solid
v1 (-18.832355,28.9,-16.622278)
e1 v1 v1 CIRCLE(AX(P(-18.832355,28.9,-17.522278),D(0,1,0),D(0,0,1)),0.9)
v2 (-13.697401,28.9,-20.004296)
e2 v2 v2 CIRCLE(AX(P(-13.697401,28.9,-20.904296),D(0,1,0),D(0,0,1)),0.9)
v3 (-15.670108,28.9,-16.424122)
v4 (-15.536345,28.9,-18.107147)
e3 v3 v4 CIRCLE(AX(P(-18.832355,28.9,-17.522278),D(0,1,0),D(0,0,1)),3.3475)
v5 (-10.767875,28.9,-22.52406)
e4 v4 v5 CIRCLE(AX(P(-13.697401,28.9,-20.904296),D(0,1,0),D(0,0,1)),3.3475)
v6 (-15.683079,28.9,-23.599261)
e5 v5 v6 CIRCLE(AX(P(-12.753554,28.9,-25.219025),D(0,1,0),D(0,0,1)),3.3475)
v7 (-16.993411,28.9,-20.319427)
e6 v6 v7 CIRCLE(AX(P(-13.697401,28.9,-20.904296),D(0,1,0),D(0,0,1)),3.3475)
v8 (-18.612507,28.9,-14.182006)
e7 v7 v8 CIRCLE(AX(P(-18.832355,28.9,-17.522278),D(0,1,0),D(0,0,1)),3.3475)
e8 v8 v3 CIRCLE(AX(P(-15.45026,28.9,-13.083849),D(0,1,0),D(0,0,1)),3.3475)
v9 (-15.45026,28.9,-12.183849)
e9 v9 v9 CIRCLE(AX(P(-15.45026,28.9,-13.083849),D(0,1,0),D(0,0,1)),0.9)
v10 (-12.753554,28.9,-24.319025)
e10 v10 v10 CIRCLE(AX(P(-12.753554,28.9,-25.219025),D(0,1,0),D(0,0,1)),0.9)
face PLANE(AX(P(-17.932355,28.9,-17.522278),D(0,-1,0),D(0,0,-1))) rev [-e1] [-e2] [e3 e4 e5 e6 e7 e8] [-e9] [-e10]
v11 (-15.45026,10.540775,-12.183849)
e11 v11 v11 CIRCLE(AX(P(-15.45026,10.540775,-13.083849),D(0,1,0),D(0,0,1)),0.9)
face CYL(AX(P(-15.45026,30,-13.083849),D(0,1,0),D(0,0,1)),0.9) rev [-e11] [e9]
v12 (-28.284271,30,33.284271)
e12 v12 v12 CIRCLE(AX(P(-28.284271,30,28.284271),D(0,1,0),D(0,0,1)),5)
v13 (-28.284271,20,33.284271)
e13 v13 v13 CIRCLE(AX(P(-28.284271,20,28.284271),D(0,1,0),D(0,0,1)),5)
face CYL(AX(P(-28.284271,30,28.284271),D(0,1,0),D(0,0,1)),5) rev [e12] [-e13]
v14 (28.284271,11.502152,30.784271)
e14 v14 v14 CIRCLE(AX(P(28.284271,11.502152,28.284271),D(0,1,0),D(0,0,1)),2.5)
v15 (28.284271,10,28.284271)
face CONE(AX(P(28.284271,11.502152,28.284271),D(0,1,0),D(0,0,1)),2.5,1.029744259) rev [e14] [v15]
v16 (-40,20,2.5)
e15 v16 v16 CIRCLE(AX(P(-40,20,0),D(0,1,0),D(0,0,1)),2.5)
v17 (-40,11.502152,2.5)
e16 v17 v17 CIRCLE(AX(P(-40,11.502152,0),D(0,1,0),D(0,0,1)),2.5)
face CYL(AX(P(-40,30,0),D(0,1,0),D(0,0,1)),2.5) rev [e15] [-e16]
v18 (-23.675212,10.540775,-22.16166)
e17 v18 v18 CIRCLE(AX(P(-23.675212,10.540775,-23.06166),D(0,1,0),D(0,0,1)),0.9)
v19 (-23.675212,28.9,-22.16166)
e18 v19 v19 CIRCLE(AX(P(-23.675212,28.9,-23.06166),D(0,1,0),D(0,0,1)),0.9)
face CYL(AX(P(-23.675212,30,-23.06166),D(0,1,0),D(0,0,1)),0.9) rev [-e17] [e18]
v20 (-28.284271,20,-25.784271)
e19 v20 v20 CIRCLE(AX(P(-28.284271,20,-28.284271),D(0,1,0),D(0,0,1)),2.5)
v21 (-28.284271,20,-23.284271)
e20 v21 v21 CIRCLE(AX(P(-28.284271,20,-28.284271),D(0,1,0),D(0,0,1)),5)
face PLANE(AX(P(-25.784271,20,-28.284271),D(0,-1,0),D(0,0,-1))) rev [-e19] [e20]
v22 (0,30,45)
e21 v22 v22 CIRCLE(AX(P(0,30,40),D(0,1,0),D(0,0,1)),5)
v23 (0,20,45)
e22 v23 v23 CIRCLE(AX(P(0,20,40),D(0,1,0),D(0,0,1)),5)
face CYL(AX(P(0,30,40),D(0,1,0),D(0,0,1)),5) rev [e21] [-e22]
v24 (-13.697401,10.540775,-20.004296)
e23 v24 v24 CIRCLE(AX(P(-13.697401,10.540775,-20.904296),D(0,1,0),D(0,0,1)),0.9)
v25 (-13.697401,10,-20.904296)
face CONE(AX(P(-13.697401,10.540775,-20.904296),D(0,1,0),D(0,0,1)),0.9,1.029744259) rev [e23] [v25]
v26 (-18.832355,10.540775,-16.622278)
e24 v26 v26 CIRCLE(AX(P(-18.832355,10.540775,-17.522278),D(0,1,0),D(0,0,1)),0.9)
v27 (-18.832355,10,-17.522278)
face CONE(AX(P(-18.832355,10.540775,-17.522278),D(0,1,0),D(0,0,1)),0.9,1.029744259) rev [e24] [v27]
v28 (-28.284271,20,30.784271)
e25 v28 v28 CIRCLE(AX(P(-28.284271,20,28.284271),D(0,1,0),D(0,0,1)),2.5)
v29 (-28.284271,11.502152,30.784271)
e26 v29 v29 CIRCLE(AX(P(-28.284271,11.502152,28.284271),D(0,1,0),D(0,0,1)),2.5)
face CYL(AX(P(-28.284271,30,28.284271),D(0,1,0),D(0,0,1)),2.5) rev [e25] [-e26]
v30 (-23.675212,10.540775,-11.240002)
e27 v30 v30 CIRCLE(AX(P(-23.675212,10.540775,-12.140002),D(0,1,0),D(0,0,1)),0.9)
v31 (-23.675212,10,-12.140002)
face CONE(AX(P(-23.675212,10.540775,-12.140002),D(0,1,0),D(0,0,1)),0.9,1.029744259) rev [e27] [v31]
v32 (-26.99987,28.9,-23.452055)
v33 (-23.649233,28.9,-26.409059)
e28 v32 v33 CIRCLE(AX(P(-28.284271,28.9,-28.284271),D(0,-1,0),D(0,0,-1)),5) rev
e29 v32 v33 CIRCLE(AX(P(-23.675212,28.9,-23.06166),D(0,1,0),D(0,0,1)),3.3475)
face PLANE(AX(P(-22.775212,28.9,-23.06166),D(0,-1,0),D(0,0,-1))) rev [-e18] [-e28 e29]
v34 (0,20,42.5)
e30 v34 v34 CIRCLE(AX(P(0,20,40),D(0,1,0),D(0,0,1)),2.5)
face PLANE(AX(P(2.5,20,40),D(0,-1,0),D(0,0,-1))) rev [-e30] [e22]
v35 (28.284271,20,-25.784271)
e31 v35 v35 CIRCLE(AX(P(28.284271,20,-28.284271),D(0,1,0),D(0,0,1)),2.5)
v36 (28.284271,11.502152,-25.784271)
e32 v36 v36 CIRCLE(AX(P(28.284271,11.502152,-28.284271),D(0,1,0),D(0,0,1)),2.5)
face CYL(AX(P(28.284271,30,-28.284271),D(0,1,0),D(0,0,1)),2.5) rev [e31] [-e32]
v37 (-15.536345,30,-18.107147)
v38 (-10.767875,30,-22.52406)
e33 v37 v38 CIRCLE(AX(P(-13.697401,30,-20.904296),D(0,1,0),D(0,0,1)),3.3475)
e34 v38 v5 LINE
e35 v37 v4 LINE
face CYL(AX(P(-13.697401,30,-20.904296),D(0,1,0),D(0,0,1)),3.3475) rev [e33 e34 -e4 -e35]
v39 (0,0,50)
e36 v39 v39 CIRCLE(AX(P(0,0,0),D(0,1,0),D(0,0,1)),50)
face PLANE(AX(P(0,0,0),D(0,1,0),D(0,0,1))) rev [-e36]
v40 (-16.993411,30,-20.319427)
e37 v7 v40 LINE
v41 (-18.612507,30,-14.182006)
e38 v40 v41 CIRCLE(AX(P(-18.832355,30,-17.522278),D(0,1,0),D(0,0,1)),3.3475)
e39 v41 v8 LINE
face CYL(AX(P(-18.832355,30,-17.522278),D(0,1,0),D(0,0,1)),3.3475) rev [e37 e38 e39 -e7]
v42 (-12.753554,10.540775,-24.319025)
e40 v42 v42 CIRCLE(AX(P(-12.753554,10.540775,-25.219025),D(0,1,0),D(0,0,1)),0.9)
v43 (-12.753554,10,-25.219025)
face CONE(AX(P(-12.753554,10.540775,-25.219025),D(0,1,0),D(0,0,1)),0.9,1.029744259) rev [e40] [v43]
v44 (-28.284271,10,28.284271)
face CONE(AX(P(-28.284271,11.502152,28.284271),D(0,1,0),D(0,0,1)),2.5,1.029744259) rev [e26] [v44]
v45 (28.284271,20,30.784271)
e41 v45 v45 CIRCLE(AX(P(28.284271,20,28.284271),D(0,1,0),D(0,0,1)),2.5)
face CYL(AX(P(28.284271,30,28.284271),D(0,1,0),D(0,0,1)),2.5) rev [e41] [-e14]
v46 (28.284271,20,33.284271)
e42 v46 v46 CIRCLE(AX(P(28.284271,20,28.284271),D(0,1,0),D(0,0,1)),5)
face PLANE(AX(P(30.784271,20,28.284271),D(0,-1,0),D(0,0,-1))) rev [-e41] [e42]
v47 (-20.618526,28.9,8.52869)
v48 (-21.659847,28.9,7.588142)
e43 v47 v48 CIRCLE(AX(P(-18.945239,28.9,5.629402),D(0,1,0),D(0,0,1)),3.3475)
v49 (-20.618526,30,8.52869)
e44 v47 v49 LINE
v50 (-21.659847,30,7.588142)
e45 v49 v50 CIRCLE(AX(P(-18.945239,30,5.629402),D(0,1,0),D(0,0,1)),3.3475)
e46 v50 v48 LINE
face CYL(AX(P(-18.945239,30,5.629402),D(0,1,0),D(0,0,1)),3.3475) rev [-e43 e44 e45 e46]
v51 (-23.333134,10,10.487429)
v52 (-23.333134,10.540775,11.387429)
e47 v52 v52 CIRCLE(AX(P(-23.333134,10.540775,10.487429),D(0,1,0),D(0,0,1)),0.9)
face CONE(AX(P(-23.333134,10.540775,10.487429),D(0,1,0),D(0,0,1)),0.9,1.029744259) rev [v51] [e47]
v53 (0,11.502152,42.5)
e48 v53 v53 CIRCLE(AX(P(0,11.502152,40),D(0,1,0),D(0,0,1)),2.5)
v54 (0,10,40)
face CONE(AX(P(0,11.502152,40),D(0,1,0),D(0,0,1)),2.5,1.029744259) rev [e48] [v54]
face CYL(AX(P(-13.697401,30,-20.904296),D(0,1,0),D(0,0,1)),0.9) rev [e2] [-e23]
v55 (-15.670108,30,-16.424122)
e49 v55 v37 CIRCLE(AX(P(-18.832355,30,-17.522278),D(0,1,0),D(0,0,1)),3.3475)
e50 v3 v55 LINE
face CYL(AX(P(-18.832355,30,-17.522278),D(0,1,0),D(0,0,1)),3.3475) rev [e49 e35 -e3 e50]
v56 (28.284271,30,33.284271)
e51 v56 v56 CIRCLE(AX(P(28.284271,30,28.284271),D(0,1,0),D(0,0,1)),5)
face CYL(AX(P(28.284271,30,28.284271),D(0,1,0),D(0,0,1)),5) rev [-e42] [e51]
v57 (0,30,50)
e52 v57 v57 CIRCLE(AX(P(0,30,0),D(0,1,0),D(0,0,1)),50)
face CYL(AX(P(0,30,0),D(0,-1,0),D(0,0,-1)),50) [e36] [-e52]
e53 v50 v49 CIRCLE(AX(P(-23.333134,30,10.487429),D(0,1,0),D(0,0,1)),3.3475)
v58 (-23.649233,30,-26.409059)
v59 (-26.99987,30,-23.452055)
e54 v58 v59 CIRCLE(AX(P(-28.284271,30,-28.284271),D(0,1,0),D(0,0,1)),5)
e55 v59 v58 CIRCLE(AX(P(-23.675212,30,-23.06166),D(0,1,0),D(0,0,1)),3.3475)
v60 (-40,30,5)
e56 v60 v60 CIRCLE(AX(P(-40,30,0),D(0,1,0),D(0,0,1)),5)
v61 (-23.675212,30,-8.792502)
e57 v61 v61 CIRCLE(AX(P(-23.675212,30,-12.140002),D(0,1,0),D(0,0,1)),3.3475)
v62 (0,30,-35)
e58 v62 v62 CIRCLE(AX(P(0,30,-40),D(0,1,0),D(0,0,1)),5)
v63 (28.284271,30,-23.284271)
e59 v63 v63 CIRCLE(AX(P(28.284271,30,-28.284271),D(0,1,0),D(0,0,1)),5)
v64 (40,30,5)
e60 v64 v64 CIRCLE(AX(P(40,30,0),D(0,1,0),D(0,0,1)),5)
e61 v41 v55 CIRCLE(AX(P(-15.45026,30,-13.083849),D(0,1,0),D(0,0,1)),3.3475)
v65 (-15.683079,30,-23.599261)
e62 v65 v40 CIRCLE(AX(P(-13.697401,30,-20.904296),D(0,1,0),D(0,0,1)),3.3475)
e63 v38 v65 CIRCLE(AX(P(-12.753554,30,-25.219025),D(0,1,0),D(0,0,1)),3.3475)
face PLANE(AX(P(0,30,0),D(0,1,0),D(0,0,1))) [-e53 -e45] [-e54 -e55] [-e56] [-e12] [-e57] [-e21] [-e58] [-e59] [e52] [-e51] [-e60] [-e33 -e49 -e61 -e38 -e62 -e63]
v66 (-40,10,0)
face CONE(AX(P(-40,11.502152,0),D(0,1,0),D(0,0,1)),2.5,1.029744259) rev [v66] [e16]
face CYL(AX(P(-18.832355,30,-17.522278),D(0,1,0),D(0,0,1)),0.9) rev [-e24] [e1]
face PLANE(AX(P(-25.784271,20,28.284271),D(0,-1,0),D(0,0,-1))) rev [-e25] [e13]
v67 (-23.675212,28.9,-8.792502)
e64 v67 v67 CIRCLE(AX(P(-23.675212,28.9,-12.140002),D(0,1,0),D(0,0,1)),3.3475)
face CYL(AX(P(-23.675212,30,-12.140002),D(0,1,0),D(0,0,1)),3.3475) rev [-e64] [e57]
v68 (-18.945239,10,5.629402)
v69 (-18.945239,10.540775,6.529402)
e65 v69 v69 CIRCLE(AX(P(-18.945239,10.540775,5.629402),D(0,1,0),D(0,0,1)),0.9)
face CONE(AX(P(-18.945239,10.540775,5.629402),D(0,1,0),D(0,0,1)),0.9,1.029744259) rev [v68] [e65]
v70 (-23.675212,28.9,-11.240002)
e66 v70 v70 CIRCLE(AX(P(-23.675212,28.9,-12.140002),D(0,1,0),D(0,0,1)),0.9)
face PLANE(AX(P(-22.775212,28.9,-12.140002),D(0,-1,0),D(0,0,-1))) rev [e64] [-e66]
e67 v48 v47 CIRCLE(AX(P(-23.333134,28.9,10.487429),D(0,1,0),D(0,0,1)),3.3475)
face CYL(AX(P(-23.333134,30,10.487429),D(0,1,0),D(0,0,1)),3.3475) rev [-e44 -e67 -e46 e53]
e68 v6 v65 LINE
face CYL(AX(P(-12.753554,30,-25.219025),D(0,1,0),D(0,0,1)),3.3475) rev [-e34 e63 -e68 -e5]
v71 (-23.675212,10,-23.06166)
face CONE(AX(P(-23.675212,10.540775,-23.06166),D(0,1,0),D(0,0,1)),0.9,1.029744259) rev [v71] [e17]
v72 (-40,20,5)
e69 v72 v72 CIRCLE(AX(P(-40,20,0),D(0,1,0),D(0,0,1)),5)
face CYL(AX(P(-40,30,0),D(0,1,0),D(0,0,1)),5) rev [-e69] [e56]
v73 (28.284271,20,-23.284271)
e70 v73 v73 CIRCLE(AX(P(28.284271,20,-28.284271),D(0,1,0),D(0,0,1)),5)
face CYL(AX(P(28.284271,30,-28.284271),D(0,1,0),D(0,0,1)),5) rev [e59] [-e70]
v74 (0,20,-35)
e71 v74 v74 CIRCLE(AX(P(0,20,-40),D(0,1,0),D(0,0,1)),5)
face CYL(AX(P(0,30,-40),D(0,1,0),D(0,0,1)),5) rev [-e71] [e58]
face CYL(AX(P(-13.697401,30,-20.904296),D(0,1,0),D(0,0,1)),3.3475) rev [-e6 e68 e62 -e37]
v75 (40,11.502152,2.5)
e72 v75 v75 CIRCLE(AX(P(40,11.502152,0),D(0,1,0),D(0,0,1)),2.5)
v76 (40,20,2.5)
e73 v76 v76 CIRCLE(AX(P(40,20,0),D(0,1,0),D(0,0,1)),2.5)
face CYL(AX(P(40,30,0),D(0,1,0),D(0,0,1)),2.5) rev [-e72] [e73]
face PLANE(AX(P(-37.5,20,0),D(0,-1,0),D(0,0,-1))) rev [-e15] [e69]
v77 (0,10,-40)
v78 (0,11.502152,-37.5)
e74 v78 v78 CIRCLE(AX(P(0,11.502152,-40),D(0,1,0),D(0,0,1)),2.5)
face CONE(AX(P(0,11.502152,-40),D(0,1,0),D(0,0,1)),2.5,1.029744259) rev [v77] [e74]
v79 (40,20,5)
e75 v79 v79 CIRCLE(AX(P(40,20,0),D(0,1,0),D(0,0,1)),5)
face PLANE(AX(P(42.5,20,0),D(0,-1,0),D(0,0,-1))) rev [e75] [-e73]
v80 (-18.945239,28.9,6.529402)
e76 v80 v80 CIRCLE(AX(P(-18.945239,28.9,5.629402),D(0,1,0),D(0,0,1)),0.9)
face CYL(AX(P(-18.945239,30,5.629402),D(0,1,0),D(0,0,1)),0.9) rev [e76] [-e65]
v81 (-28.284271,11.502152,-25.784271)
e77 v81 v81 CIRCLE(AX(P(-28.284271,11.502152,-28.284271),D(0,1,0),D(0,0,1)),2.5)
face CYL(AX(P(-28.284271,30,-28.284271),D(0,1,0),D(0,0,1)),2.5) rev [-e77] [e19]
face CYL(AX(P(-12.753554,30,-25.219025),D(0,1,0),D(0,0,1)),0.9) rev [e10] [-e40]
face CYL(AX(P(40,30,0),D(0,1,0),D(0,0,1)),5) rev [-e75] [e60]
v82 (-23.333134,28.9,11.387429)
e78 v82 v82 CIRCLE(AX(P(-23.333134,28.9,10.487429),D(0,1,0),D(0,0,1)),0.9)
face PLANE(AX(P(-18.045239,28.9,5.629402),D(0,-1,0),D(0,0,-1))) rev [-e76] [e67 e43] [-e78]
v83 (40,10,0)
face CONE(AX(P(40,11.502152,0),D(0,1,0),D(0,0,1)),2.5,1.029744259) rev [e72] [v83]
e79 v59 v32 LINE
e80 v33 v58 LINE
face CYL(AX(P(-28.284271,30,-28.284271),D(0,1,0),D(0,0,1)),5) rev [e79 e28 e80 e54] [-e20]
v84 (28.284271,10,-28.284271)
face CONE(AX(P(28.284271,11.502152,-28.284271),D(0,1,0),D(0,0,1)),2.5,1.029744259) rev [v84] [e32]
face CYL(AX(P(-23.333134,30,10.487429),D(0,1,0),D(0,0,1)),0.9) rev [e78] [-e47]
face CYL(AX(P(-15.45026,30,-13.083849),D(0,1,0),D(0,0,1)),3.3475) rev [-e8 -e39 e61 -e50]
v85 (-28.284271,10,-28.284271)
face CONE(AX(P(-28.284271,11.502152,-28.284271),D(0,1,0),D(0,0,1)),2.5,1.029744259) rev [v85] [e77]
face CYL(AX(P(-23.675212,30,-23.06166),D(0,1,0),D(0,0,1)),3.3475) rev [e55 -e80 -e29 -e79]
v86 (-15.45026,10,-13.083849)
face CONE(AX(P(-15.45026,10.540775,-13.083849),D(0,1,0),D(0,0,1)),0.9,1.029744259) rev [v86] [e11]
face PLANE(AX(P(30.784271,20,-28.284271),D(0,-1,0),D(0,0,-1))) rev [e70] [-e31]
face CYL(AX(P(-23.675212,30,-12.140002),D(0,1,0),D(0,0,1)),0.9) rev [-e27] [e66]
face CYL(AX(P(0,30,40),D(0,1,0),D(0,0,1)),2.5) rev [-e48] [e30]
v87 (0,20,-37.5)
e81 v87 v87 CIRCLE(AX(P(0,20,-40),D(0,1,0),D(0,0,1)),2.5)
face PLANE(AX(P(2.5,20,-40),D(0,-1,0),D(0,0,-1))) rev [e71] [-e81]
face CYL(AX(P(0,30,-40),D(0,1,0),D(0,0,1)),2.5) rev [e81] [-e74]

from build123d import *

# Parameters (mm, degrees)
SKETCH1_R           = 50
BOSS_EXTRUDE1_DEPTH = 30
CIRPATTERN1_COUNT   = 8


# Read off the part's stored shape, not the designer's step: Sketch-Pattern1
with BuildPart() as part:
    # Sketch1 → Boss-Extrude1 (new body)
    with BuildSketch(Plane(origin=(0, 0, 0), x_dir=(1, 0, 0), z_dir=(0, 1, 0))):
        with Locations(Location((0, 0, 0), (0, 0, 270))):
            Circle(SKETCH1_R)
    extrude(amount=BOSS_EXTRUDE1_DEPTH)

    # Sketch5 → CBORE for M5 Hex Head Cap Screw1 (revolve, cut)
    with BuildSketch(Plane(origin=(0, 30, -40), x_dir=(0, 0, 1), z_dir=(1, 0, 0))):
        Polygon((0, 0), (0, 20), (2.5, 18.497848452), (2.5, 10), (5, 10), (5, 0), align=None)
    cbore_for_m5_hex_head_cap_screw1 = revolve(axis=Axis((0, 36.35, -40), (0, -1, 0)), mode=Mode.SUBTRACT)

    # CirPattern1: CBORE for M5 Hex Head Cap Screw1 ×8 about axis
    cirpattern1_axis = Axis((0, 0, 0), (0, 1, 0))
    for i in range(1, CIRPATTERN1_COUNT):
        add(cbore_for_m5_hex_head_cap_screw1.rotate(cirpattern1_axis, i * 360 / CIRPATTERN1_COUNT), mode=Mode.SUBTRACT)

    # Sketch6 → Hole Wizard 950 (revolve, cut)
    with BuildSketch(Plane(origin=(-18.945239219, 30, 5.62940246), x_dir=(0, 0, 1), z_dir=(1, 0, 0))):
        Polygon((0, 0), (0, 20), (0.9, 19.459225443), (0.9, 1.1), (3.3475, 1.1), (3.3475, 0), align=None)
    hole_wizard_950 = revolve(axis=Axis((-18.945239219, 36.35, 5.62940246), (0, -1, 0)), mode=Mode.SUBTRACT)

    # Sketch-Pattern1 outline → Sketch-Pattern1 (revolve, cut)
    with BuildSketch(Plane(origin=(-23.333134216, 0, 10.487429063), x_dir=(1, 0, 0), z_dir=(0, 0, 1))):
        Polygon((3.3475, 30), (0, 30), (0, 10), (0.9, 10.540774557), (0.9, 28.9), (3.3475, 28.9), align=None)
    revolve(axis=Axis((-23.333134216, 0, 10.487429063), (0, 1, 0)), mode=Mode.SUBTRACT)

    # Sketch-Pattern2: Hole Wizard 950 at 6 more places
    with Locations((0.112884, 0, -23.151681), (-4.729973, 0, -17.769404), (3.49498, 0, -18.713251), (5.247838, 0, -26.533698), (-4.729973, 0, -28.691063), (6.191685, 0, -30.848427)):
        add(hole_wizard_950, mode=Mode.SUBTRACT)


solid = part.part
